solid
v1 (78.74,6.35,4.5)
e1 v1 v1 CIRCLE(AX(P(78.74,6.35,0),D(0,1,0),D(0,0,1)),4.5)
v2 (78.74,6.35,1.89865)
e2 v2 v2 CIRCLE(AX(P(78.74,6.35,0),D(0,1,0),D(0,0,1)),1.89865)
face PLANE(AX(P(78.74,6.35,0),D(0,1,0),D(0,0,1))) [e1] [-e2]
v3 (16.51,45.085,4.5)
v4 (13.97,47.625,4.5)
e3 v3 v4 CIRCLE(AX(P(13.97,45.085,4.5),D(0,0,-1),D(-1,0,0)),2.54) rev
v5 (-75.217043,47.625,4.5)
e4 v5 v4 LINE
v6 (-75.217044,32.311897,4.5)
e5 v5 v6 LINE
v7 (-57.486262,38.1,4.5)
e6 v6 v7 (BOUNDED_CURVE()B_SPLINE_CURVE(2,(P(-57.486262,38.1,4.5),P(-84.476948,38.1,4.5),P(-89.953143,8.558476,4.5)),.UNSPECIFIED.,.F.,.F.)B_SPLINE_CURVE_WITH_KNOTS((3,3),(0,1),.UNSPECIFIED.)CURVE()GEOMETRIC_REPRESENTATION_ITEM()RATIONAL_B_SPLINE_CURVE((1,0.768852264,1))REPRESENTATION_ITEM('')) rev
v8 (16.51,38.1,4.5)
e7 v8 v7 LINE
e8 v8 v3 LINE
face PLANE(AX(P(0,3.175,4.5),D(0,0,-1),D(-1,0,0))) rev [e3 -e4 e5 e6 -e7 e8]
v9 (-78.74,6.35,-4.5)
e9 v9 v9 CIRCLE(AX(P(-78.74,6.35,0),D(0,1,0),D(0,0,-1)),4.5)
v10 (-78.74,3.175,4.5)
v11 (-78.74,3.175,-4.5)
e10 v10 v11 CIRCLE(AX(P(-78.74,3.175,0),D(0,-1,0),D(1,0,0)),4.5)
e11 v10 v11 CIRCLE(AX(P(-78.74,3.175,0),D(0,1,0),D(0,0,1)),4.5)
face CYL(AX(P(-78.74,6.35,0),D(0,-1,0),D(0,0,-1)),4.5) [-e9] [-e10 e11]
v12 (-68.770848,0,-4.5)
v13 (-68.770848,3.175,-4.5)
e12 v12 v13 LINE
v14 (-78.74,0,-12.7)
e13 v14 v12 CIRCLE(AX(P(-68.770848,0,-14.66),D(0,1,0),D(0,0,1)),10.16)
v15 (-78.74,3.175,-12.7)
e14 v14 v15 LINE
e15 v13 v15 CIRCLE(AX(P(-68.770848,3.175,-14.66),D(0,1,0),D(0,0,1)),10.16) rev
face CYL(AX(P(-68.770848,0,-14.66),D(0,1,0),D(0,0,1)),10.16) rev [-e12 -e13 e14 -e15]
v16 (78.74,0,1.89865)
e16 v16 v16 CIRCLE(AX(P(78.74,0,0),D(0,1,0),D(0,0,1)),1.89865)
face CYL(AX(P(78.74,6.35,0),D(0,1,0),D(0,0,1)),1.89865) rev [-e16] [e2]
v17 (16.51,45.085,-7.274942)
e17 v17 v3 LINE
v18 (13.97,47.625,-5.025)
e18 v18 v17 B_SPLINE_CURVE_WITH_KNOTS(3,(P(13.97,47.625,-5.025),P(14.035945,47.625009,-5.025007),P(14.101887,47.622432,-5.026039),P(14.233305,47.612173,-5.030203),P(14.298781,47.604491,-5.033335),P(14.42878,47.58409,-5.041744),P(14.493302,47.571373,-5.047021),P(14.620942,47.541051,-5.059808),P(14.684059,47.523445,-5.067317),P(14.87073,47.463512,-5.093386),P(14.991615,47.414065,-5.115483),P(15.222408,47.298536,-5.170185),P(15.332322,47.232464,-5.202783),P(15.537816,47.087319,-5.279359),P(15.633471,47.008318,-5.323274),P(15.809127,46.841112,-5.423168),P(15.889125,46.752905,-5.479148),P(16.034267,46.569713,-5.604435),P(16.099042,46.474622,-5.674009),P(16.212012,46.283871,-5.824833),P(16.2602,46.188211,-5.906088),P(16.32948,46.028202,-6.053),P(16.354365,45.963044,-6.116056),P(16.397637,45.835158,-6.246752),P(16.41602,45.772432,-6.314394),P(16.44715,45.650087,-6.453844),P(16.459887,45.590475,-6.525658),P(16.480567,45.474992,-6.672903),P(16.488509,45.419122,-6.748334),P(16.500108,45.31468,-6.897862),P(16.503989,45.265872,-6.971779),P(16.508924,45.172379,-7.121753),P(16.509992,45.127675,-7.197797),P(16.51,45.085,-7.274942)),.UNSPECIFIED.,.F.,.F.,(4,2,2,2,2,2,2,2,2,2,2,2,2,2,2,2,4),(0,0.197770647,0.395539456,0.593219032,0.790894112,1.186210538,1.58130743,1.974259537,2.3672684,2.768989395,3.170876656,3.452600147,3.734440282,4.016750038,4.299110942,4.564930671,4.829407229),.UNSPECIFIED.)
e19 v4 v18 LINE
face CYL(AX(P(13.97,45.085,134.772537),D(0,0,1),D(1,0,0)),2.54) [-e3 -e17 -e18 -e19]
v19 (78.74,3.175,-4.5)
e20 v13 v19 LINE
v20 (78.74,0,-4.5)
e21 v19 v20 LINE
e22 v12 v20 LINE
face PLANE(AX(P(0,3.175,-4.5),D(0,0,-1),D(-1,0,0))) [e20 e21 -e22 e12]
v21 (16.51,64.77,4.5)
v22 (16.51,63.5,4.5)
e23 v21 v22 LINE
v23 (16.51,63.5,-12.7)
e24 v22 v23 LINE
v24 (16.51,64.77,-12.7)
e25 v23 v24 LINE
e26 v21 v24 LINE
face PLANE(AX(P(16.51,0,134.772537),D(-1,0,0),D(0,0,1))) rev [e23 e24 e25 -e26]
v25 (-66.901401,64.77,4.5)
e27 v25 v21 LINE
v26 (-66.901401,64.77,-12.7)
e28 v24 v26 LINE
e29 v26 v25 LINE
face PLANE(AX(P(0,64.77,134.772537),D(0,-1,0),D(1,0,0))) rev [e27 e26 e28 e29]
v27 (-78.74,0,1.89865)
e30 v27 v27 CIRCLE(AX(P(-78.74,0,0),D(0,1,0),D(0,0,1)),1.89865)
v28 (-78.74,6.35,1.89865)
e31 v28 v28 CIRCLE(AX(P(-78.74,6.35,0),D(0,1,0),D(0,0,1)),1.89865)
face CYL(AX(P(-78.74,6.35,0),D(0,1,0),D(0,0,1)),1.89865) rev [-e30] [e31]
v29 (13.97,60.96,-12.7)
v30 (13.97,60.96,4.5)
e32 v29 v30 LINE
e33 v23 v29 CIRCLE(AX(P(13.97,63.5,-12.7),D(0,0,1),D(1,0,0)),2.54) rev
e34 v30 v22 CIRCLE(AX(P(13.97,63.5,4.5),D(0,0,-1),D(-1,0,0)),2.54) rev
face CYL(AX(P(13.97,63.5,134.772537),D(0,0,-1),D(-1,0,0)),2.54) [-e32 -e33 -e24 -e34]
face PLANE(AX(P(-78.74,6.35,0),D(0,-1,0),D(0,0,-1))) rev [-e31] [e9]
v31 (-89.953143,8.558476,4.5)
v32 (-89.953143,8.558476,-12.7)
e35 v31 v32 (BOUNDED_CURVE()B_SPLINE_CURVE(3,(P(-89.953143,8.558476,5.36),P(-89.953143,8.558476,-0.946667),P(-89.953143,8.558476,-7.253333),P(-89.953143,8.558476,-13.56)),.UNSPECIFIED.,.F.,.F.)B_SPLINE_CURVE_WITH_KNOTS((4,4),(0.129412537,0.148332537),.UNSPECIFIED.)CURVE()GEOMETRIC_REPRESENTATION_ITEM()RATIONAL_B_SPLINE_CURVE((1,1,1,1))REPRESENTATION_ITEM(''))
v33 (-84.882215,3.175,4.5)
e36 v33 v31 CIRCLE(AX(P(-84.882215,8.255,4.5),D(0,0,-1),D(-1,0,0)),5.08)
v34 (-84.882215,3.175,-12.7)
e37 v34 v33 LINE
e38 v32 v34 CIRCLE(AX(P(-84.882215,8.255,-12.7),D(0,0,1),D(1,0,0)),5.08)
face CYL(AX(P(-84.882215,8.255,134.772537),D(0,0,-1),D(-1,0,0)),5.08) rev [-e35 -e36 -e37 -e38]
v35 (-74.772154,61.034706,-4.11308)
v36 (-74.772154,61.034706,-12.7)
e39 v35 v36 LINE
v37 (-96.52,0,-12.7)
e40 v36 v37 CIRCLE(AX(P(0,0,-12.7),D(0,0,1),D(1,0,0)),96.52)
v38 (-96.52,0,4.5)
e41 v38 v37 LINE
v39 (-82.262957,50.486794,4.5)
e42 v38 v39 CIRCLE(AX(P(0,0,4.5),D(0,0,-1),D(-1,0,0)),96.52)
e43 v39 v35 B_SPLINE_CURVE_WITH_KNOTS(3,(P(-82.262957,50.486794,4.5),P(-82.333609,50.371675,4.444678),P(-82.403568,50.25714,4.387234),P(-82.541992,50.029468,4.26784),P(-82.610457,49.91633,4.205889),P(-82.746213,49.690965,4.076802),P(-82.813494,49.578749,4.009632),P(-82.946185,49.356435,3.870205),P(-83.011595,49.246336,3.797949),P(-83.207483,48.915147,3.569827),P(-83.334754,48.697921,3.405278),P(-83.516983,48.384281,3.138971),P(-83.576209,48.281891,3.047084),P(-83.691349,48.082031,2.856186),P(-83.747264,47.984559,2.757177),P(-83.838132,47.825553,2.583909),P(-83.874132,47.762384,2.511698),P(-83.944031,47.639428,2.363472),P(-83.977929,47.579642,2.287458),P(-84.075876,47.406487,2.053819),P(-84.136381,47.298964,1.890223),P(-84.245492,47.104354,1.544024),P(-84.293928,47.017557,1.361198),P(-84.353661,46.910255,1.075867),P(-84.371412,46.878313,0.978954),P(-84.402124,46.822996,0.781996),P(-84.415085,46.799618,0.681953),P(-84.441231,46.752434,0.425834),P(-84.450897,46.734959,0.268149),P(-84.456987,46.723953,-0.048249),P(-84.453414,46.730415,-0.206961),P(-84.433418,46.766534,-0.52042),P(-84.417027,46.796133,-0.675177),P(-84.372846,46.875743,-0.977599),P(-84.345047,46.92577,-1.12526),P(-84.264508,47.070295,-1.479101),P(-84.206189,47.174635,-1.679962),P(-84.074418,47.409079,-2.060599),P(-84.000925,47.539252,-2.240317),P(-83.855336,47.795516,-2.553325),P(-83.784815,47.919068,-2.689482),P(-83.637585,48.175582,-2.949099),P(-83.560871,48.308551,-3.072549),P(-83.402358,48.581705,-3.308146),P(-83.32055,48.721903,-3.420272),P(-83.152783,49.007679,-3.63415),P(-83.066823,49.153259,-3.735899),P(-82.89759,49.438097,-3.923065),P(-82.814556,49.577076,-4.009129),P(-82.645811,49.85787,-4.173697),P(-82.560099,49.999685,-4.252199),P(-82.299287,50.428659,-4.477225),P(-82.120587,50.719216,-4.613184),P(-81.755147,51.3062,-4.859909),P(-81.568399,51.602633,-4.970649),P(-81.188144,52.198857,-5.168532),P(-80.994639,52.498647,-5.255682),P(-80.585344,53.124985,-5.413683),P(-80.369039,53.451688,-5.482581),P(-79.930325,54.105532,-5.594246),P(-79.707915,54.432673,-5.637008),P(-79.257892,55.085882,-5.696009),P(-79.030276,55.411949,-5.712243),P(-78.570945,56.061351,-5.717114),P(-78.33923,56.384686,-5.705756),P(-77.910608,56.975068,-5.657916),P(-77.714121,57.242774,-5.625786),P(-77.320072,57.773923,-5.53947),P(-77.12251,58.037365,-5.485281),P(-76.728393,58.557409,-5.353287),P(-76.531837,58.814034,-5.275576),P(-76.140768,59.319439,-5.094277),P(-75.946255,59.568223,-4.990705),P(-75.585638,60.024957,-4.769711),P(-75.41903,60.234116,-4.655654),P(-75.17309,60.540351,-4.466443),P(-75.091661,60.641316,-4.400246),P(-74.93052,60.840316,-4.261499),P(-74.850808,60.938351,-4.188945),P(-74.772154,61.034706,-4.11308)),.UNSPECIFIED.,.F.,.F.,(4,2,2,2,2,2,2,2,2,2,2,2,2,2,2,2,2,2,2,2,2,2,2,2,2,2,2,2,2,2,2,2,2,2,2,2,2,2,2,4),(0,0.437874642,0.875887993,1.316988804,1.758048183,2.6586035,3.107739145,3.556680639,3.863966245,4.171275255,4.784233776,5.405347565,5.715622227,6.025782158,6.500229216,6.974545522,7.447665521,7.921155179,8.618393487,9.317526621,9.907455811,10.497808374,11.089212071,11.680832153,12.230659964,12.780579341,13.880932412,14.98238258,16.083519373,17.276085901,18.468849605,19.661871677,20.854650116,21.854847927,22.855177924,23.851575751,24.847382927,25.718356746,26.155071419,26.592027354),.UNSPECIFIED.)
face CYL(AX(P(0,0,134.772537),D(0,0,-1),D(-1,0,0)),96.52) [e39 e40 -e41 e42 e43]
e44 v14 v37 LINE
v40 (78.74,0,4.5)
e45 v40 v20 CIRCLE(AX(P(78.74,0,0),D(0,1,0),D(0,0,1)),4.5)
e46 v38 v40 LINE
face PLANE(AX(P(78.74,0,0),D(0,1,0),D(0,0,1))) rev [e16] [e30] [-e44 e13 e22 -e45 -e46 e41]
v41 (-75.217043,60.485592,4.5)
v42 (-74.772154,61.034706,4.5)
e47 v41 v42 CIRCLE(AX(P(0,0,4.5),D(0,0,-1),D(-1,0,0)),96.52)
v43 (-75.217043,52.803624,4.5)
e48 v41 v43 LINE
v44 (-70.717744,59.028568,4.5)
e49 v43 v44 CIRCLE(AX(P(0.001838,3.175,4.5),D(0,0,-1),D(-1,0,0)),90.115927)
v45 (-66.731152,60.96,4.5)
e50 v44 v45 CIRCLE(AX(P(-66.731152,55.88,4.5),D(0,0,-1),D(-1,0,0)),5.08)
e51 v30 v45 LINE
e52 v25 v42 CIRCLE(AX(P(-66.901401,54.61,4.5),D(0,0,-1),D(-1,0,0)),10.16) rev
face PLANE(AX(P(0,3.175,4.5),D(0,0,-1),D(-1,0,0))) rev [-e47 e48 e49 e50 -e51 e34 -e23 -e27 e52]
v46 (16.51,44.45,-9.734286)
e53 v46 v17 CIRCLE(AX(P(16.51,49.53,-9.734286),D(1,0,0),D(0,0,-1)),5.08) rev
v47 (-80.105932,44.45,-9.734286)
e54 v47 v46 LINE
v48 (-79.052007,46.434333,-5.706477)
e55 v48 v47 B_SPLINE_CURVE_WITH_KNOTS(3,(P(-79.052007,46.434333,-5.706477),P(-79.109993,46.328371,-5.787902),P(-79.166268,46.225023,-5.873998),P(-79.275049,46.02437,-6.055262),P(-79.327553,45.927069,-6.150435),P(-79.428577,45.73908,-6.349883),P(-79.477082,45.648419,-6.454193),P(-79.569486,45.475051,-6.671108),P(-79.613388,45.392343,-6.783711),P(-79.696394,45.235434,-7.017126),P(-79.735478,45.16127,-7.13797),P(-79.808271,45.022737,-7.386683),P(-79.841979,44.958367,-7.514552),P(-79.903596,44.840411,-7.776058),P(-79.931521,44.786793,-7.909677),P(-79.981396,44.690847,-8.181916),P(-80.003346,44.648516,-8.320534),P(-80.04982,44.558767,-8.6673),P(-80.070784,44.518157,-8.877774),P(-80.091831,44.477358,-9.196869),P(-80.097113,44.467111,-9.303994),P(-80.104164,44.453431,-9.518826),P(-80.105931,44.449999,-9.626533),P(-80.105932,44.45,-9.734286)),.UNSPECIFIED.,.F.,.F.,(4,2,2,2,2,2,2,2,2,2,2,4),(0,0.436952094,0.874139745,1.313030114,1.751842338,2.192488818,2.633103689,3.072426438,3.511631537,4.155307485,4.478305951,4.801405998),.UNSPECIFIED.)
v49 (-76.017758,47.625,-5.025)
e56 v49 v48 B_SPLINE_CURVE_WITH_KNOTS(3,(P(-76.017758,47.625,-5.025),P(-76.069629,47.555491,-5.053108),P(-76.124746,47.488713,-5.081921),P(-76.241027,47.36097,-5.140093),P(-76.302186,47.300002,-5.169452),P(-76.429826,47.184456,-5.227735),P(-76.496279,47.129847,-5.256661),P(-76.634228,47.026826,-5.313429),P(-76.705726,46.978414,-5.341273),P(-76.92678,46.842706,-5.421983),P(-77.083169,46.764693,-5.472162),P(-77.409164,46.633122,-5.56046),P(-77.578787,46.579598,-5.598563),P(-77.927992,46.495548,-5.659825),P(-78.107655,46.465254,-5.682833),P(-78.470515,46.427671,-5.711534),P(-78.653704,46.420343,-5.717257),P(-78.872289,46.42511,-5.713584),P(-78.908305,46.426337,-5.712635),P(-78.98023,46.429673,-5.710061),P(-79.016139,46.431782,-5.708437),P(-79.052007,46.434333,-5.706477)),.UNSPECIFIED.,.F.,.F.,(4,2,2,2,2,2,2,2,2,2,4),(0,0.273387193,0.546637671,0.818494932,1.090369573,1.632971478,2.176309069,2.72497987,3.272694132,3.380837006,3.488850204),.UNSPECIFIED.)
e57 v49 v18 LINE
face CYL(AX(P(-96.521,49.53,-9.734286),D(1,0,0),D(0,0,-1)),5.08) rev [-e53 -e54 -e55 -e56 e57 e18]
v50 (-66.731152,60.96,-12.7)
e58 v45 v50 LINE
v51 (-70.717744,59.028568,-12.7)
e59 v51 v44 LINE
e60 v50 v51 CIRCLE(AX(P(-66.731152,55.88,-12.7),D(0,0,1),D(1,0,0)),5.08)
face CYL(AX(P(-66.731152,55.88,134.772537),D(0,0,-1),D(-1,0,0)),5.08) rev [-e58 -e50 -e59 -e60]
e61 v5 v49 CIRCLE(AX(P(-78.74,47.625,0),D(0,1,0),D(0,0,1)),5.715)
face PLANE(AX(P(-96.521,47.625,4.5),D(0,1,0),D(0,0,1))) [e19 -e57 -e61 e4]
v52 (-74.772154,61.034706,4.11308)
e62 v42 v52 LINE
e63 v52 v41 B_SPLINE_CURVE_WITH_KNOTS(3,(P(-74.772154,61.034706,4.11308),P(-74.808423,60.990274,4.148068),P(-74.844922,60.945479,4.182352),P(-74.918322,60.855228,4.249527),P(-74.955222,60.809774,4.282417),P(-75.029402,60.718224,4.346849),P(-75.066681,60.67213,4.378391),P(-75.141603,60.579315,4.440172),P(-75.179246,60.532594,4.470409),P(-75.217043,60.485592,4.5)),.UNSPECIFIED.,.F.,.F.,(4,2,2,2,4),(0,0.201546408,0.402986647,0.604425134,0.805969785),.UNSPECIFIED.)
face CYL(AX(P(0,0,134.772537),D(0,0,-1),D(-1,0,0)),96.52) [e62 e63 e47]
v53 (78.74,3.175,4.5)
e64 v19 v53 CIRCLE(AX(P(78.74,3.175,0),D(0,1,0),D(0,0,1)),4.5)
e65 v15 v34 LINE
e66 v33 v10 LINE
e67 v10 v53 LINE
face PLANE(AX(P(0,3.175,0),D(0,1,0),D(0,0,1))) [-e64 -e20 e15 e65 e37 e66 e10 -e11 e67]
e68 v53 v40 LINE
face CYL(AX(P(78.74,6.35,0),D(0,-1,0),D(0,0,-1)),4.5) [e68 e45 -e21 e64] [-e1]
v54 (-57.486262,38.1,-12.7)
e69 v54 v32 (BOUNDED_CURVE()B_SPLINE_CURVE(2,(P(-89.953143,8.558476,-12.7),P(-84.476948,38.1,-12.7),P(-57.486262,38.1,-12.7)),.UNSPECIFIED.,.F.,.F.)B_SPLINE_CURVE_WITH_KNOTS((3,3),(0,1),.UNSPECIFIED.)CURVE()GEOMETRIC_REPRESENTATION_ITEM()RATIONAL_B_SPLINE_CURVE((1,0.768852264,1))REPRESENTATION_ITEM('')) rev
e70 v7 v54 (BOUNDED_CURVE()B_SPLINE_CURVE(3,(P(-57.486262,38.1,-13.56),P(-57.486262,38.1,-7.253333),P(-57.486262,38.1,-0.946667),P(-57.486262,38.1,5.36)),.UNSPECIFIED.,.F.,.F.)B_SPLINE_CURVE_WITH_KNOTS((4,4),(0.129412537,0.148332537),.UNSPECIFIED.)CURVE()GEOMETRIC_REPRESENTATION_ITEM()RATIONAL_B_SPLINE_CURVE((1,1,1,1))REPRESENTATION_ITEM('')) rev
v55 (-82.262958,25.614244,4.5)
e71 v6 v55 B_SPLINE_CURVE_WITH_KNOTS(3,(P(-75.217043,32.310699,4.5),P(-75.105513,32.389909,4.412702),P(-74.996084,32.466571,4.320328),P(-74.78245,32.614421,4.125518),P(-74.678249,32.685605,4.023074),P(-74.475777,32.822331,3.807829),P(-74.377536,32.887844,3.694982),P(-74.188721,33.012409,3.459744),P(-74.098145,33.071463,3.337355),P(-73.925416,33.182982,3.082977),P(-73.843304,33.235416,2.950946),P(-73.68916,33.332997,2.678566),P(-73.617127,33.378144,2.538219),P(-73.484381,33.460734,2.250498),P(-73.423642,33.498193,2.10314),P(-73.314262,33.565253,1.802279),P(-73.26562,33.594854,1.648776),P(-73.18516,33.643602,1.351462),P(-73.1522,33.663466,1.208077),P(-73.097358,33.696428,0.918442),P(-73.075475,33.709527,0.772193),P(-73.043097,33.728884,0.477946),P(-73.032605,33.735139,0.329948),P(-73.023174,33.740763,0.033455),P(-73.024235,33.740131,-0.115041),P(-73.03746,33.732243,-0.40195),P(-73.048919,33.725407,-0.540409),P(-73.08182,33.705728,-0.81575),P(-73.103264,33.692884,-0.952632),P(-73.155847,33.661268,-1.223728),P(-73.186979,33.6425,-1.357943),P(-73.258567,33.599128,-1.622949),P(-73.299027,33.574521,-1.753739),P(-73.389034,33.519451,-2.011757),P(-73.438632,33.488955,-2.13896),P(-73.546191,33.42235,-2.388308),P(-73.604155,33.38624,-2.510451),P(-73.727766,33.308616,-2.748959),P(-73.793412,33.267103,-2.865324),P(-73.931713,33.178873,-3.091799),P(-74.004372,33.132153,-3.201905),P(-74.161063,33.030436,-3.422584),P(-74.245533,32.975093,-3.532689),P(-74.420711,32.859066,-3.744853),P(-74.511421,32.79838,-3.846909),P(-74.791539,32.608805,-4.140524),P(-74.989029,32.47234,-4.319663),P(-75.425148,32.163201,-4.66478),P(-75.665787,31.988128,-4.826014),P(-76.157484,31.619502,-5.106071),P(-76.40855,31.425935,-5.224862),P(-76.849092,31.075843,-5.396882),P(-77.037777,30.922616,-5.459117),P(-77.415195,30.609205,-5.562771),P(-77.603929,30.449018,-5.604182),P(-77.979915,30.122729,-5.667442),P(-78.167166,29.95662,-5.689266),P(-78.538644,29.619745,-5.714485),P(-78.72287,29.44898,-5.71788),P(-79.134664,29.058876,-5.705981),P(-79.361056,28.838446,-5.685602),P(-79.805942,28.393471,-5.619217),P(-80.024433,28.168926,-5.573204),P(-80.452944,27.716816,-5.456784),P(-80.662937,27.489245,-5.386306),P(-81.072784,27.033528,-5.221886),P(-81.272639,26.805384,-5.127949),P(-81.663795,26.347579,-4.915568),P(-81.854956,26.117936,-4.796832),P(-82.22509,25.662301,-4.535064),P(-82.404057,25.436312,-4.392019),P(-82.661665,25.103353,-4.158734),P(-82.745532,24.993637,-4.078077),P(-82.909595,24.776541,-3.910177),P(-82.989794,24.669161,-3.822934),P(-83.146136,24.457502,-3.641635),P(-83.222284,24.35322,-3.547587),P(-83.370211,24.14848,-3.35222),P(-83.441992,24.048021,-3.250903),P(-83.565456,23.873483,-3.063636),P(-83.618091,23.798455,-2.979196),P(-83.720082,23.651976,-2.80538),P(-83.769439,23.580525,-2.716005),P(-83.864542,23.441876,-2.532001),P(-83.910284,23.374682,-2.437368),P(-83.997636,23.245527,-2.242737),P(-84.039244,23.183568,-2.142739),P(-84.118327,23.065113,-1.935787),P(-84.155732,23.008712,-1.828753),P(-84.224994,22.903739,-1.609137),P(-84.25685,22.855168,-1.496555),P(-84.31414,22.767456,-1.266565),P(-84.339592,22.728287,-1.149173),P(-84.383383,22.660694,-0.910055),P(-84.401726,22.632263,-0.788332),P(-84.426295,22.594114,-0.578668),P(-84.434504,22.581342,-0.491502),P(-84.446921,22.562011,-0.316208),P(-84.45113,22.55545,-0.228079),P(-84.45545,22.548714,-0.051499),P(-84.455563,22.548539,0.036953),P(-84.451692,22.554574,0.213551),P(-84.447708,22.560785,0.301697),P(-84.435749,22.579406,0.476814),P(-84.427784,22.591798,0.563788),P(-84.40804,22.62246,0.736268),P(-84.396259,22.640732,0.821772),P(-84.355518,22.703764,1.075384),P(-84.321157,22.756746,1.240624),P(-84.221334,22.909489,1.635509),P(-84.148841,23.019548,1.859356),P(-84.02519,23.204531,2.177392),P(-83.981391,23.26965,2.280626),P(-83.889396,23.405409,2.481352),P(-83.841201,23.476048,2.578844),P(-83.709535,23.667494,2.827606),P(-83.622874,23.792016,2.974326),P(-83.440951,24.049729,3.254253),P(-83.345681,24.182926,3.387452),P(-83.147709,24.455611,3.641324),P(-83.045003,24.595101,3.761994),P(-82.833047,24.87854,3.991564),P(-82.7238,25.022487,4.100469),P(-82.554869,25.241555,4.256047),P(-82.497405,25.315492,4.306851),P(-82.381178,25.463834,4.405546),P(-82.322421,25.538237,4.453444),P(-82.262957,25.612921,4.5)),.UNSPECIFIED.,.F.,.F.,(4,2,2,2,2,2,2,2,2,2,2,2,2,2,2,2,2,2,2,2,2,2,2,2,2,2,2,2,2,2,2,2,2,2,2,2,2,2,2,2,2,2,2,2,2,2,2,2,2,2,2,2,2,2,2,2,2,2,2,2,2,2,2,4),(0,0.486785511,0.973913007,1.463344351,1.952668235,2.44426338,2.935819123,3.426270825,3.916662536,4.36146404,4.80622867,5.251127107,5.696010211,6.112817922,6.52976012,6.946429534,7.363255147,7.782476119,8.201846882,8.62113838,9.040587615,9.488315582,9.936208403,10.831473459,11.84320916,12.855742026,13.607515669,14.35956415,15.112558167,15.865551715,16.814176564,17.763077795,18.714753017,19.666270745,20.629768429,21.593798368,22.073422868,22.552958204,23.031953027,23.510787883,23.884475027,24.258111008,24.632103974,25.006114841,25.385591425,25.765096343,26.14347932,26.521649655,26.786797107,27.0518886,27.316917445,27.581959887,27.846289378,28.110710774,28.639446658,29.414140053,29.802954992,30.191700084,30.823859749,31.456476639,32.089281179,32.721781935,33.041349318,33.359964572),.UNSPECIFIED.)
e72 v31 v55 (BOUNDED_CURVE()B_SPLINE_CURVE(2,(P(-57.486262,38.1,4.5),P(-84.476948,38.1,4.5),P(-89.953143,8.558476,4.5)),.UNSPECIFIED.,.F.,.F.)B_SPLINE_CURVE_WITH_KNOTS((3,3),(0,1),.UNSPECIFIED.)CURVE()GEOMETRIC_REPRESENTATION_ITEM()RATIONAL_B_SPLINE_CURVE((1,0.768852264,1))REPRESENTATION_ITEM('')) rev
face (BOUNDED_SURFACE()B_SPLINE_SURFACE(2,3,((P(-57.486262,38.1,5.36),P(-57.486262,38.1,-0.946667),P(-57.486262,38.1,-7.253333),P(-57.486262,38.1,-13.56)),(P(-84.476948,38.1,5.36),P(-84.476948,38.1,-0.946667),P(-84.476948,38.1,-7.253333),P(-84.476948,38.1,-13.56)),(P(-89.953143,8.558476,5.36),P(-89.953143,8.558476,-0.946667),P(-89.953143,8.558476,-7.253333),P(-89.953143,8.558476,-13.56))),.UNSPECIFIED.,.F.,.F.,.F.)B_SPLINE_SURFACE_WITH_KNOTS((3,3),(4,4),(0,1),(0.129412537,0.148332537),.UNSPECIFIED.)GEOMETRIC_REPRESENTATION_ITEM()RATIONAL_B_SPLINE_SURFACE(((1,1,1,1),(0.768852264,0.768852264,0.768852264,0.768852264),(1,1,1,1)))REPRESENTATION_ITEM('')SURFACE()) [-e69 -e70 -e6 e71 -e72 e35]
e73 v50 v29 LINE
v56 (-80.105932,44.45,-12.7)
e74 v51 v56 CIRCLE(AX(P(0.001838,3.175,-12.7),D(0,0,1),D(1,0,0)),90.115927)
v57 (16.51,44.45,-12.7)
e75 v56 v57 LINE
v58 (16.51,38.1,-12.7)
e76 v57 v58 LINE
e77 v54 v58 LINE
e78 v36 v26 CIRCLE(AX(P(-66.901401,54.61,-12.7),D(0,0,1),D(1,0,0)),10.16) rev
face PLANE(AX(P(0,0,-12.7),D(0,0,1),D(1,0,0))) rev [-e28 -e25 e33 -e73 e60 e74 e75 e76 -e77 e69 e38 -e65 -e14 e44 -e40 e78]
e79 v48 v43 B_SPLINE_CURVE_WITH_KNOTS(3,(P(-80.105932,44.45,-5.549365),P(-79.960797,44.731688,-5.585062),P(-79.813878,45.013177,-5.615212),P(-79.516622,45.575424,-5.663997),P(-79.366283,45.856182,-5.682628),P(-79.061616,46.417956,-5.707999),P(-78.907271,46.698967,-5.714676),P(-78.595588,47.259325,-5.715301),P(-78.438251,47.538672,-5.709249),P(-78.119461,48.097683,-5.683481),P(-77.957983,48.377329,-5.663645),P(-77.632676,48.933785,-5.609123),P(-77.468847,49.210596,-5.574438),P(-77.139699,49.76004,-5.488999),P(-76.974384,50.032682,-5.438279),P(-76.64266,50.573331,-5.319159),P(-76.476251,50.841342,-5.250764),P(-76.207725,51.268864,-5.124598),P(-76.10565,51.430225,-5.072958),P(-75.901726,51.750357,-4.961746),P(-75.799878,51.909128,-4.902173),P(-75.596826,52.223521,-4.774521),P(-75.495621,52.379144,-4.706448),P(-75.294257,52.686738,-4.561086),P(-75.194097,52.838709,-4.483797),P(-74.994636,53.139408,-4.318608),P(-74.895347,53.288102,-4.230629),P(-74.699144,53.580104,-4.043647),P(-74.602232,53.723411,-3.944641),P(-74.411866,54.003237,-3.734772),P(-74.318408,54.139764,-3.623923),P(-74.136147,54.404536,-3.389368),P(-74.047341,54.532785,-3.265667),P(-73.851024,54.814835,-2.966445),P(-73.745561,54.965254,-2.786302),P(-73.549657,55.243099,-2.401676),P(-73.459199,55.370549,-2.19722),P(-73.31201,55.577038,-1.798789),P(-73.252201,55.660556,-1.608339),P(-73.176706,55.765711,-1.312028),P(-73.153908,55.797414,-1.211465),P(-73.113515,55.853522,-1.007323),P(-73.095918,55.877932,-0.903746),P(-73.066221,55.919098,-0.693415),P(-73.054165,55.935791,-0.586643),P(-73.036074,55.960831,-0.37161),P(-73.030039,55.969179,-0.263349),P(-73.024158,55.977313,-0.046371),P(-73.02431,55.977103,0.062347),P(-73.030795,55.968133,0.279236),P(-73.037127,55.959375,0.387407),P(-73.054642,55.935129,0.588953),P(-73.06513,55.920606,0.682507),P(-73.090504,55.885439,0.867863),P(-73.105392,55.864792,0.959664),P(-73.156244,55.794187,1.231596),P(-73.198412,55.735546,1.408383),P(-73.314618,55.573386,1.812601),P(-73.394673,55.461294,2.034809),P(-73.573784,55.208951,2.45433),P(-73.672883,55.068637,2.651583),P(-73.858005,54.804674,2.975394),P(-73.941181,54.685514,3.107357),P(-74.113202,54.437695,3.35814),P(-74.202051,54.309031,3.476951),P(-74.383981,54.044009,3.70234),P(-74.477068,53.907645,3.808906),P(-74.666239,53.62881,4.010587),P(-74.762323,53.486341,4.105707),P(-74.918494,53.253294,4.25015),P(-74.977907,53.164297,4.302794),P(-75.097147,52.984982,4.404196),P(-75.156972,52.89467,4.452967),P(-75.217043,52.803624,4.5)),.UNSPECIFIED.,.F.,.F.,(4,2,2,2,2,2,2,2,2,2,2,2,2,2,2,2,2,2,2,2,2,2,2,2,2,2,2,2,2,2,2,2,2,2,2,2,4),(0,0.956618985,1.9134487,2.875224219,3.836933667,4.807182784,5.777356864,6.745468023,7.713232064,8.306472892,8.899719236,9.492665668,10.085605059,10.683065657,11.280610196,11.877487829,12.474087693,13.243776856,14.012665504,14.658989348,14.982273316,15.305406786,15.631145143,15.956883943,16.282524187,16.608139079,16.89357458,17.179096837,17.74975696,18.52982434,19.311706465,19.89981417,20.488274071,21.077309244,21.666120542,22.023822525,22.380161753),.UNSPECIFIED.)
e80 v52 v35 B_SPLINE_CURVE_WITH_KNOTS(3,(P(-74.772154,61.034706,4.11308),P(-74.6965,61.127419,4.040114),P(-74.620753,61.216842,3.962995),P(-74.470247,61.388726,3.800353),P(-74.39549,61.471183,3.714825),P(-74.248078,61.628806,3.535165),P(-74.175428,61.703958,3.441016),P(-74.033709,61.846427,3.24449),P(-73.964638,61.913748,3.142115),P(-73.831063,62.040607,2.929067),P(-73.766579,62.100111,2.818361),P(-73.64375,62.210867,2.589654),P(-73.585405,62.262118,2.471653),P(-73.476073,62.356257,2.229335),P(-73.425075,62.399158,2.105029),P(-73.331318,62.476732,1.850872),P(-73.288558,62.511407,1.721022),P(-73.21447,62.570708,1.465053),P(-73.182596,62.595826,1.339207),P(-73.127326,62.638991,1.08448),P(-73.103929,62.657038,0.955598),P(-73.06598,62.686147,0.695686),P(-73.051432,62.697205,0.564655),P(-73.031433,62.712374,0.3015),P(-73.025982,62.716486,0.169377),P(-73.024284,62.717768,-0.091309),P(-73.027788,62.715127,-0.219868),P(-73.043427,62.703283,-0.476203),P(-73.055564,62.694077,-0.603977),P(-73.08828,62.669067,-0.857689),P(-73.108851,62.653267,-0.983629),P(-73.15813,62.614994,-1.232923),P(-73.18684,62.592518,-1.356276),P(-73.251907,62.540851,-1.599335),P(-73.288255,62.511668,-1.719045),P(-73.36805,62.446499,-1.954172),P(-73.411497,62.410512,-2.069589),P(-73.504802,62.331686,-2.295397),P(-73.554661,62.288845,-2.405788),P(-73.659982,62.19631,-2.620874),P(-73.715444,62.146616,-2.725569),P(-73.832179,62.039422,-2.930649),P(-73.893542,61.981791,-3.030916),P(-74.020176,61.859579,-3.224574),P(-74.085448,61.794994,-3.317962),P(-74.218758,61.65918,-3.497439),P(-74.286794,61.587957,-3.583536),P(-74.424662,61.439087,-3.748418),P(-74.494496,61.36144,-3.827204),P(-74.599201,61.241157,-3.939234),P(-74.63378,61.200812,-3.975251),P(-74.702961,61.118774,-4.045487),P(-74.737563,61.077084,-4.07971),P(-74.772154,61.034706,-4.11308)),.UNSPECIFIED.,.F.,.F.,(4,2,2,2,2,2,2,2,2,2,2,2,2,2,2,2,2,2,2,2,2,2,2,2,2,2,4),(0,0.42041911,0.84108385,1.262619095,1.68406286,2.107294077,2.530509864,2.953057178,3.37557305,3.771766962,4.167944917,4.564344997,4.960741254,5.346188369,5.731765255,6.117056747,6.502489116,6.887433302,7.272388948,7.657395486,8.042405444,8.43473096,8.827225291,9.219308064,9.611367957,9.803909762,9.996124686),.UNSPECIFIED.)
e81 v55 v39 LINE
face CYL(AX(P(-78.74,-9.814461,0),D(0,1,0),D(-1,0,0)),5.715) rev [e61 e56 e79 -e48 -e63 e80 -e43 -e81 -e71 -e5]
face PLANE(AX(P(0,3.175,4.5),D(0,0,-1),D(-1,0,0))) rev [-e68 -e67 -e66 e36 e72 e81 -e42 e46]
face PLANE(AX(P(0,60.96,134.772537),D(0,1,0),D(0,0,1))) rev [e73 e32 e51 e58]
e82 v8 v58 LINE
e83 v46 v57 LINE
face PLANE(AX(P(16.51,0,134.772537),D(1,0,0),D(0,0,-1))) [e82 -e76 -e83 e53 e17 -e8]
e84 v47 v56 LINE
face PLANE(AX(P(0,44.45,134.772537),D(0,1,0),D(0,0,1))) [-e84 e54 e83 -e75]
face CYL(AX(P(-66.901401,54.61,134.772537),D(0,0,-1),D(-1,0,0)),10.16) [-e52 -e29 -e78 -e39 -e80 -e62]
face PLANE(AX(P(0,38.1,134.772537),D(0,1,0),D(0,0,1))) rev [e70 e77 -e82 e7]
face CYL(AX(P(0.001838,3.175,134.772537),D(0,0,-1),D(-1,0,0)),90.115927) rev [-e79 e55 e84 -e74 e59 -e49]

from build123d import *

# Parameters (mm, degrees)
SKETCH1_R                       = 4.5
BOSS_EXTRUDE1_DEPTH             = 6.35
BOSS_EXTRUDE1_2_DEPTH           = 6.35
BOSS_EXTRUDE2_DEPTH             = 3.175
BOSS_EXTRUDE3_DEPTH             = 12.7
BOSS_EXTRUDE3_DIRECTION_2_REACH = 85.603
FILLET1_R                       = 5.08
FILLET2_R                       = 10.16
F_6_CLEARANCE_HOLE1_D           = 3.7973
F_6_CLEARANCE_HOLE1_DEPTH       = 6.35
FILLET5_START                   = -12.7
FILLET5_DEPTH                   = 17.2
CUT_EXTRUDE1_START              = -56.211523666
CUT_EXTRUDE1_DEPTH              = 56.211523666
BOSS_EXTRUDE5_REACH             = 132.89
BOSS_EXTRUDE5_END_RADIUS        = 5.715
SKETCH8_W                       = 9.525
SKETCH8_H                       = 3.175
FILLET6_R                       = 5.08
FILLET7_R                       = 2.54


with BuildPart() as part:
    # Sketch1 → Boss-Extrude1 (new body)
    with BuildSketch(Plane(origin=(0, 0, 0), x_dir=(1, 0, 0), z_dir=(0, 1, 0))):
        with Locations(Location((78.74, 0, 0), (0, 0, 270))):
            Circle(SKETCH1_R)
    extrude(amount=BOSS_EXTRUDE1_DEPTH)



with BuildPart() as body_2:
    # Sketch1 → Boss-Extrude1 2 (new body)
    with BuildSketch(Plane(origin=(0, 0, 0), x_dir=(1, 0, 0), z_dir=(0, 1, 0))):
        with Locations(Location((-78.74, 0, 0), (0, 0, 90))):
            Circle(SKETCH1_R)
    extrude(amount=BOSS_EXTRUDE1_2_DEPTH)


with BuildPart() as part_1:
    add(part.part)

    add(body_2.part)  # Boss-Extrude2 merges body 2
    # Sketch2 → Boss-Extrude2 (add)
    with BuildSketch(Plane(origin=(0, 0, 0), x_dir=(1, 0, 0), z_dir=(0, 1, 0))):
        with BuildLine():
            Line((78.74, 4.5), (-78.74, 4.5))
            ThreePointArc((-78.74, 4.5), (-75.558019485, 3.181980515), (-74.24, 0))
            ThreePointArc((-74.24, 0), (-75.558019485, -3.181980515), (-78.74, -4.5))
            Line((-78.74, -4.5), (78.74, -4.5))
            ThreePointArc((78.74, -4.5), (74.24, 0), (78.74, 4.5))
        make_face()
    extrude(amount=BOSS_EXTRUDE2_DEPTH)

    # Sketch3 → Boss-Extrude3 (add)
    with BuildSketch(Plane.XY):
        with BuildLine():
            Line((-78.74, 0), (-78.74, 3.175))
            Line((-78.74, 3.175), (-90.114089339, 3.175))
            ThreePointArc((-90.114089339, 3.175), (-88.335814095, 20.989027697), (-83.071170469, 38.1))
            Line((-83.071170469, 38.1), (16.51, 38.1))
            Line((16.51, 38.1), (16.51, 44.45))
            Line((16.51, 44.45), (-80.105931514, 44.45))
            ThreePointArc((-80.105931514, 44.45), (-75.082403553, 53.007088382), (-69.148535375, 60.96))
            Line((-69.148535375, 60.96), (16.51, 60.96))
            Line((16.51, 60.96), (16.51, 64.77))
            Line((16.51, 64.77), (-71.560865702, 64.77))
            ThreePointArc((-71.560865702, 64.77), (-90.064324673, 34.70630809), (-96.52, 0))
            Line((-96.52, 0), (-78.74, 0))
        make_face()
    extrude(amount=-BOSS_EXTRUDE3_DEPTH)

    # Boss-Extrude3 direction 2: up to this face of the body (flat: up to its plane)
    boss_extrude3_direction_2_end = Plane(part_1.part.faces().sort_by_distance((0, 1.5875, 4.5))[0])
    # Sketch3 → Boss-Extrude3 direction 2 (add, up to the picked face)
    with BuildSketch(Plane.XY, mode=Mode.PRIVATE) as boss_extrude3_direction_2_sk1:
        with BuildLine():
            Line((-78.74, 0), (-78.74, 3.175))
            Line((-78.74, 3.175), (-90.114089339, 3.175))
            ThreePointArc((-90.114089339, 3.175), (-88.335814095, 20.989027697), (-83.071170469, 38.1))
            Line((-83.071170469, 38.1), (16.51, 38.1))
            Line((16.51, 38.1), (16.51, 44.45))
            Line((16.51, 44.45), (-80.105931514, 44.45))
            ThreePointArc((-80.105931514, 44.45), (-75.082403553, 53.007088382), (-69.148535375, 60.96))
            Line((-69.148535375, 60.96), (16.51, 60.96))
            Line((16.51, 60.96), (16.51, 64.77))
            Line((16.51, 64.77), (-71.560865702, 64.77))
            ThreePointArc((-71.560865702, 64.77), (-90.064324673, 34.70630809), (-96.52, 0))
            Line((-96.52, 0), (-78.74, 0))
        make_face()
    boss_extrude3_direction_2_tool1 = split(extrude(boss_extrude3_direction_2_sk1.sketch, amount=BOSS_EXTRUDE3_DIRECTION_2_REACH, mode=Mode.PRIVATE), bisect_by=boss_extrude3_direction_2_end, keep=Keep.BOTH, mode=Mode.PRIVATE)
    add(boss_extrude3_direction_2_tool1.solids().sort_by(Axis((-47.115631, 42.638129, 0), (0, 0, 1)))[0])

    # Fillet1
    fillet1_edges = [part_1.edges().sort_by_distance(p)[0] for p in [
        (-69.148535375, 60.96, -4.1),
        (-90.114089339, 3.175, -4.1),
    ]]
    fillet(fillet1_edges, radius=FILLET1_R)

    # Fillet2
    # the kernel refuses this fillet: 10.16 mm, written as the material it adds along each edge
    with BuildSketch(Plane(origin=(-78.74, 0, -4.5), x_dir=(1, 0, 0), z_dir=(0, 1, 0))) as fillet2_piece_1:
        with BuildLine():
            CenterArc((9.969152421, 10.16), FILLET2_R, 191.12285511, 78.87714489)
            Line((0, 8.2), (0, 0))
            Line((0, 0), (9.969152421, 0))
        make_face()
    extrude(amount=3.175)
    # the kernel refuses this fillet: 10.16 mm, written as the material it takes off along each edge
    with BuildSketch(Plane(origin=(-71.560865702, 64.77, 16.814827808), x_dir=(1, 0, 0), z_dir=(0, 0, -1))) as fillet2_2_piece_1:
        with BuildLine():
            CenterArc((4.659464371, 10.16), FILLET2_R, 219.223932399, 50.776067601)
            ThreePointArc((-3.211288726, 3.735294118), (-1.629477245, 1.847157571), (0, 0))
            Line((0, 0), (4.659464371, 0))
        make_face()
    extrude(amount=41.829655616, mode=Mode.SUBTRACT)

    # #6 Clearance Hole1
    with Locations(Plane(origin=(-78.74, 6.35, 0), x_dir=(0, 0, 1), z_dir=(0, 1, 0))):
        with Locations((0, 0), (0, 157.48)):
            Hole(F_6_CLEARANCE_HOLE1_D / 2, depth=F_6_CLEARANCE_HOLE1_DEPTH)

    # Fillet5: read off the stored shape, not the designer's step
    # Fillet5 outline → Fillet5 (add)
    with BuildSketch(Plane.XY.offset(FILLET5_START)):
        with BuildLine():
            add(Edge.make_bspline(
                [(-57.486261954, 38.1), (-84.476947832, 38.1), (-89.953142639, 8.558476434)],
                knots=[0, 0, 0, 1, 1, 1], degree=2, weights=[1, 0.768852264, 1]))
            Line((-57.486261954, 38.1), (-83.071170469, 38.1))
            ThreePointArc((-83.071170469, 38.1), (-87.76402471, 23.620872526), (-89.953142639, 8.558476434))
        make_face()
    extrude(amount=FILLET5_DEPTH)

    # Cut-Extrude1: read off the stored shape, not the designer's step
    # Cut-Extrude1 outline → Cut-Extrude1 (cut)
    with BuildSketch(Plane(origin=(0, 64.77, 0), x_dir=(1, 0, 0), z_dir=(0, 1, 0)).offset(CUT_EXTRUDE1_START)):
        with BuildLine():
            Line((-82.262956855, -4.5), (-75.217043145, -4.5))
            ThreePointArc((-75.217043145, -4.5), (-78.74, 5.715), (-82.262956855, -4.5))
        make_face()
    extrude(amount=CUT_EXTRUDE1_DEPTH, mode=Mode.SUBTRACT)

    # Boss-Extrude5: up to this cylinder (the profile starts outside it)
    boss_extrude5_end = Plane(origin=(-78.74, 46.0375, 0), z_dir=(0, 1, 0)) * Cylinder(BOSS_EXTRUDE5_END_RADIUS, 278.21, mode=Mode.PRIVATE)
    # Sketch8 → Boss-Extrude5 (add, up to the surface)
    with BuildSketch(Plane(origin=(16.51, 0, 0), x_dir=(0, 0, -1), z_dir=(1, 0, 0)), mode=Mode.PRIVATE) as boss_extrude5_sk1:
        with Locations((0.2625, 46.0375)):
            Rectangle(SKETCH8_W, SKETCH8_H)
    boss_extrude5_tool1 = extrude(boss_extrude5_sk1.sketch, amount=-BOSS_EXTRUDE5_REACH, mode=Mode.PRIVATE) - boss_extrude5_end
    add(boss_extrude5_tool1.solids().sort_by_distance((16.51, 46.0375, -0.2625))[0])

    # Fillet6
    # the kernel refuses this fillet: 5.08 mm, written as the material it adds along each edge
    with BuildSketch(Plane(origin=(16.51, 44.45, -5.025), x_dir=(0, 1, 0), z_dir=(-1, 0, 0))) as fillet6_piece_1_section:
        with BuildLine():
            CenterArc((5.08, 4.709286039), FILLET6_R, 180, 67.975687163)
            Line((0, 4.709286039), (0, 0))
            Line((0, 0), (3.175, 0))
        make_face()
    fillet6_piece_1 = extrude(amount=104.300973375, mode=Mode.PRIVATE)
    fillet6_piece_1 = fillet6_piece_1 - Plane(origin=(-78.74, 44.45, 0), x_dir=(1, 0, 0), z_dir=(0, 1, 0)) * Cylinder(5.715, 228, mode=Mode.PRIVATE)
    fillet6_piece_1 = fillet6_piece_1 & Plane(origin=(0, 0, -5.025), x_dir=(-0.7414097151042524, 0.671052631578948, 0), z_dir=(0, 0, 1)) * Cylinder(96.52, 228, mode=Mode.PRIVATE)
    add(fillet6_piece_1)

    # Fillet7
    fillet7_edges = [part_1.edges().sort_by_distance(p)[0] for p in [
        (16.51, 47.625, -0.2625),
        (16.51, 60.96, -4.1),
    ]]
    fillet(fillet7_edges, radius=FILLET7_R)


solid = part_1.part
